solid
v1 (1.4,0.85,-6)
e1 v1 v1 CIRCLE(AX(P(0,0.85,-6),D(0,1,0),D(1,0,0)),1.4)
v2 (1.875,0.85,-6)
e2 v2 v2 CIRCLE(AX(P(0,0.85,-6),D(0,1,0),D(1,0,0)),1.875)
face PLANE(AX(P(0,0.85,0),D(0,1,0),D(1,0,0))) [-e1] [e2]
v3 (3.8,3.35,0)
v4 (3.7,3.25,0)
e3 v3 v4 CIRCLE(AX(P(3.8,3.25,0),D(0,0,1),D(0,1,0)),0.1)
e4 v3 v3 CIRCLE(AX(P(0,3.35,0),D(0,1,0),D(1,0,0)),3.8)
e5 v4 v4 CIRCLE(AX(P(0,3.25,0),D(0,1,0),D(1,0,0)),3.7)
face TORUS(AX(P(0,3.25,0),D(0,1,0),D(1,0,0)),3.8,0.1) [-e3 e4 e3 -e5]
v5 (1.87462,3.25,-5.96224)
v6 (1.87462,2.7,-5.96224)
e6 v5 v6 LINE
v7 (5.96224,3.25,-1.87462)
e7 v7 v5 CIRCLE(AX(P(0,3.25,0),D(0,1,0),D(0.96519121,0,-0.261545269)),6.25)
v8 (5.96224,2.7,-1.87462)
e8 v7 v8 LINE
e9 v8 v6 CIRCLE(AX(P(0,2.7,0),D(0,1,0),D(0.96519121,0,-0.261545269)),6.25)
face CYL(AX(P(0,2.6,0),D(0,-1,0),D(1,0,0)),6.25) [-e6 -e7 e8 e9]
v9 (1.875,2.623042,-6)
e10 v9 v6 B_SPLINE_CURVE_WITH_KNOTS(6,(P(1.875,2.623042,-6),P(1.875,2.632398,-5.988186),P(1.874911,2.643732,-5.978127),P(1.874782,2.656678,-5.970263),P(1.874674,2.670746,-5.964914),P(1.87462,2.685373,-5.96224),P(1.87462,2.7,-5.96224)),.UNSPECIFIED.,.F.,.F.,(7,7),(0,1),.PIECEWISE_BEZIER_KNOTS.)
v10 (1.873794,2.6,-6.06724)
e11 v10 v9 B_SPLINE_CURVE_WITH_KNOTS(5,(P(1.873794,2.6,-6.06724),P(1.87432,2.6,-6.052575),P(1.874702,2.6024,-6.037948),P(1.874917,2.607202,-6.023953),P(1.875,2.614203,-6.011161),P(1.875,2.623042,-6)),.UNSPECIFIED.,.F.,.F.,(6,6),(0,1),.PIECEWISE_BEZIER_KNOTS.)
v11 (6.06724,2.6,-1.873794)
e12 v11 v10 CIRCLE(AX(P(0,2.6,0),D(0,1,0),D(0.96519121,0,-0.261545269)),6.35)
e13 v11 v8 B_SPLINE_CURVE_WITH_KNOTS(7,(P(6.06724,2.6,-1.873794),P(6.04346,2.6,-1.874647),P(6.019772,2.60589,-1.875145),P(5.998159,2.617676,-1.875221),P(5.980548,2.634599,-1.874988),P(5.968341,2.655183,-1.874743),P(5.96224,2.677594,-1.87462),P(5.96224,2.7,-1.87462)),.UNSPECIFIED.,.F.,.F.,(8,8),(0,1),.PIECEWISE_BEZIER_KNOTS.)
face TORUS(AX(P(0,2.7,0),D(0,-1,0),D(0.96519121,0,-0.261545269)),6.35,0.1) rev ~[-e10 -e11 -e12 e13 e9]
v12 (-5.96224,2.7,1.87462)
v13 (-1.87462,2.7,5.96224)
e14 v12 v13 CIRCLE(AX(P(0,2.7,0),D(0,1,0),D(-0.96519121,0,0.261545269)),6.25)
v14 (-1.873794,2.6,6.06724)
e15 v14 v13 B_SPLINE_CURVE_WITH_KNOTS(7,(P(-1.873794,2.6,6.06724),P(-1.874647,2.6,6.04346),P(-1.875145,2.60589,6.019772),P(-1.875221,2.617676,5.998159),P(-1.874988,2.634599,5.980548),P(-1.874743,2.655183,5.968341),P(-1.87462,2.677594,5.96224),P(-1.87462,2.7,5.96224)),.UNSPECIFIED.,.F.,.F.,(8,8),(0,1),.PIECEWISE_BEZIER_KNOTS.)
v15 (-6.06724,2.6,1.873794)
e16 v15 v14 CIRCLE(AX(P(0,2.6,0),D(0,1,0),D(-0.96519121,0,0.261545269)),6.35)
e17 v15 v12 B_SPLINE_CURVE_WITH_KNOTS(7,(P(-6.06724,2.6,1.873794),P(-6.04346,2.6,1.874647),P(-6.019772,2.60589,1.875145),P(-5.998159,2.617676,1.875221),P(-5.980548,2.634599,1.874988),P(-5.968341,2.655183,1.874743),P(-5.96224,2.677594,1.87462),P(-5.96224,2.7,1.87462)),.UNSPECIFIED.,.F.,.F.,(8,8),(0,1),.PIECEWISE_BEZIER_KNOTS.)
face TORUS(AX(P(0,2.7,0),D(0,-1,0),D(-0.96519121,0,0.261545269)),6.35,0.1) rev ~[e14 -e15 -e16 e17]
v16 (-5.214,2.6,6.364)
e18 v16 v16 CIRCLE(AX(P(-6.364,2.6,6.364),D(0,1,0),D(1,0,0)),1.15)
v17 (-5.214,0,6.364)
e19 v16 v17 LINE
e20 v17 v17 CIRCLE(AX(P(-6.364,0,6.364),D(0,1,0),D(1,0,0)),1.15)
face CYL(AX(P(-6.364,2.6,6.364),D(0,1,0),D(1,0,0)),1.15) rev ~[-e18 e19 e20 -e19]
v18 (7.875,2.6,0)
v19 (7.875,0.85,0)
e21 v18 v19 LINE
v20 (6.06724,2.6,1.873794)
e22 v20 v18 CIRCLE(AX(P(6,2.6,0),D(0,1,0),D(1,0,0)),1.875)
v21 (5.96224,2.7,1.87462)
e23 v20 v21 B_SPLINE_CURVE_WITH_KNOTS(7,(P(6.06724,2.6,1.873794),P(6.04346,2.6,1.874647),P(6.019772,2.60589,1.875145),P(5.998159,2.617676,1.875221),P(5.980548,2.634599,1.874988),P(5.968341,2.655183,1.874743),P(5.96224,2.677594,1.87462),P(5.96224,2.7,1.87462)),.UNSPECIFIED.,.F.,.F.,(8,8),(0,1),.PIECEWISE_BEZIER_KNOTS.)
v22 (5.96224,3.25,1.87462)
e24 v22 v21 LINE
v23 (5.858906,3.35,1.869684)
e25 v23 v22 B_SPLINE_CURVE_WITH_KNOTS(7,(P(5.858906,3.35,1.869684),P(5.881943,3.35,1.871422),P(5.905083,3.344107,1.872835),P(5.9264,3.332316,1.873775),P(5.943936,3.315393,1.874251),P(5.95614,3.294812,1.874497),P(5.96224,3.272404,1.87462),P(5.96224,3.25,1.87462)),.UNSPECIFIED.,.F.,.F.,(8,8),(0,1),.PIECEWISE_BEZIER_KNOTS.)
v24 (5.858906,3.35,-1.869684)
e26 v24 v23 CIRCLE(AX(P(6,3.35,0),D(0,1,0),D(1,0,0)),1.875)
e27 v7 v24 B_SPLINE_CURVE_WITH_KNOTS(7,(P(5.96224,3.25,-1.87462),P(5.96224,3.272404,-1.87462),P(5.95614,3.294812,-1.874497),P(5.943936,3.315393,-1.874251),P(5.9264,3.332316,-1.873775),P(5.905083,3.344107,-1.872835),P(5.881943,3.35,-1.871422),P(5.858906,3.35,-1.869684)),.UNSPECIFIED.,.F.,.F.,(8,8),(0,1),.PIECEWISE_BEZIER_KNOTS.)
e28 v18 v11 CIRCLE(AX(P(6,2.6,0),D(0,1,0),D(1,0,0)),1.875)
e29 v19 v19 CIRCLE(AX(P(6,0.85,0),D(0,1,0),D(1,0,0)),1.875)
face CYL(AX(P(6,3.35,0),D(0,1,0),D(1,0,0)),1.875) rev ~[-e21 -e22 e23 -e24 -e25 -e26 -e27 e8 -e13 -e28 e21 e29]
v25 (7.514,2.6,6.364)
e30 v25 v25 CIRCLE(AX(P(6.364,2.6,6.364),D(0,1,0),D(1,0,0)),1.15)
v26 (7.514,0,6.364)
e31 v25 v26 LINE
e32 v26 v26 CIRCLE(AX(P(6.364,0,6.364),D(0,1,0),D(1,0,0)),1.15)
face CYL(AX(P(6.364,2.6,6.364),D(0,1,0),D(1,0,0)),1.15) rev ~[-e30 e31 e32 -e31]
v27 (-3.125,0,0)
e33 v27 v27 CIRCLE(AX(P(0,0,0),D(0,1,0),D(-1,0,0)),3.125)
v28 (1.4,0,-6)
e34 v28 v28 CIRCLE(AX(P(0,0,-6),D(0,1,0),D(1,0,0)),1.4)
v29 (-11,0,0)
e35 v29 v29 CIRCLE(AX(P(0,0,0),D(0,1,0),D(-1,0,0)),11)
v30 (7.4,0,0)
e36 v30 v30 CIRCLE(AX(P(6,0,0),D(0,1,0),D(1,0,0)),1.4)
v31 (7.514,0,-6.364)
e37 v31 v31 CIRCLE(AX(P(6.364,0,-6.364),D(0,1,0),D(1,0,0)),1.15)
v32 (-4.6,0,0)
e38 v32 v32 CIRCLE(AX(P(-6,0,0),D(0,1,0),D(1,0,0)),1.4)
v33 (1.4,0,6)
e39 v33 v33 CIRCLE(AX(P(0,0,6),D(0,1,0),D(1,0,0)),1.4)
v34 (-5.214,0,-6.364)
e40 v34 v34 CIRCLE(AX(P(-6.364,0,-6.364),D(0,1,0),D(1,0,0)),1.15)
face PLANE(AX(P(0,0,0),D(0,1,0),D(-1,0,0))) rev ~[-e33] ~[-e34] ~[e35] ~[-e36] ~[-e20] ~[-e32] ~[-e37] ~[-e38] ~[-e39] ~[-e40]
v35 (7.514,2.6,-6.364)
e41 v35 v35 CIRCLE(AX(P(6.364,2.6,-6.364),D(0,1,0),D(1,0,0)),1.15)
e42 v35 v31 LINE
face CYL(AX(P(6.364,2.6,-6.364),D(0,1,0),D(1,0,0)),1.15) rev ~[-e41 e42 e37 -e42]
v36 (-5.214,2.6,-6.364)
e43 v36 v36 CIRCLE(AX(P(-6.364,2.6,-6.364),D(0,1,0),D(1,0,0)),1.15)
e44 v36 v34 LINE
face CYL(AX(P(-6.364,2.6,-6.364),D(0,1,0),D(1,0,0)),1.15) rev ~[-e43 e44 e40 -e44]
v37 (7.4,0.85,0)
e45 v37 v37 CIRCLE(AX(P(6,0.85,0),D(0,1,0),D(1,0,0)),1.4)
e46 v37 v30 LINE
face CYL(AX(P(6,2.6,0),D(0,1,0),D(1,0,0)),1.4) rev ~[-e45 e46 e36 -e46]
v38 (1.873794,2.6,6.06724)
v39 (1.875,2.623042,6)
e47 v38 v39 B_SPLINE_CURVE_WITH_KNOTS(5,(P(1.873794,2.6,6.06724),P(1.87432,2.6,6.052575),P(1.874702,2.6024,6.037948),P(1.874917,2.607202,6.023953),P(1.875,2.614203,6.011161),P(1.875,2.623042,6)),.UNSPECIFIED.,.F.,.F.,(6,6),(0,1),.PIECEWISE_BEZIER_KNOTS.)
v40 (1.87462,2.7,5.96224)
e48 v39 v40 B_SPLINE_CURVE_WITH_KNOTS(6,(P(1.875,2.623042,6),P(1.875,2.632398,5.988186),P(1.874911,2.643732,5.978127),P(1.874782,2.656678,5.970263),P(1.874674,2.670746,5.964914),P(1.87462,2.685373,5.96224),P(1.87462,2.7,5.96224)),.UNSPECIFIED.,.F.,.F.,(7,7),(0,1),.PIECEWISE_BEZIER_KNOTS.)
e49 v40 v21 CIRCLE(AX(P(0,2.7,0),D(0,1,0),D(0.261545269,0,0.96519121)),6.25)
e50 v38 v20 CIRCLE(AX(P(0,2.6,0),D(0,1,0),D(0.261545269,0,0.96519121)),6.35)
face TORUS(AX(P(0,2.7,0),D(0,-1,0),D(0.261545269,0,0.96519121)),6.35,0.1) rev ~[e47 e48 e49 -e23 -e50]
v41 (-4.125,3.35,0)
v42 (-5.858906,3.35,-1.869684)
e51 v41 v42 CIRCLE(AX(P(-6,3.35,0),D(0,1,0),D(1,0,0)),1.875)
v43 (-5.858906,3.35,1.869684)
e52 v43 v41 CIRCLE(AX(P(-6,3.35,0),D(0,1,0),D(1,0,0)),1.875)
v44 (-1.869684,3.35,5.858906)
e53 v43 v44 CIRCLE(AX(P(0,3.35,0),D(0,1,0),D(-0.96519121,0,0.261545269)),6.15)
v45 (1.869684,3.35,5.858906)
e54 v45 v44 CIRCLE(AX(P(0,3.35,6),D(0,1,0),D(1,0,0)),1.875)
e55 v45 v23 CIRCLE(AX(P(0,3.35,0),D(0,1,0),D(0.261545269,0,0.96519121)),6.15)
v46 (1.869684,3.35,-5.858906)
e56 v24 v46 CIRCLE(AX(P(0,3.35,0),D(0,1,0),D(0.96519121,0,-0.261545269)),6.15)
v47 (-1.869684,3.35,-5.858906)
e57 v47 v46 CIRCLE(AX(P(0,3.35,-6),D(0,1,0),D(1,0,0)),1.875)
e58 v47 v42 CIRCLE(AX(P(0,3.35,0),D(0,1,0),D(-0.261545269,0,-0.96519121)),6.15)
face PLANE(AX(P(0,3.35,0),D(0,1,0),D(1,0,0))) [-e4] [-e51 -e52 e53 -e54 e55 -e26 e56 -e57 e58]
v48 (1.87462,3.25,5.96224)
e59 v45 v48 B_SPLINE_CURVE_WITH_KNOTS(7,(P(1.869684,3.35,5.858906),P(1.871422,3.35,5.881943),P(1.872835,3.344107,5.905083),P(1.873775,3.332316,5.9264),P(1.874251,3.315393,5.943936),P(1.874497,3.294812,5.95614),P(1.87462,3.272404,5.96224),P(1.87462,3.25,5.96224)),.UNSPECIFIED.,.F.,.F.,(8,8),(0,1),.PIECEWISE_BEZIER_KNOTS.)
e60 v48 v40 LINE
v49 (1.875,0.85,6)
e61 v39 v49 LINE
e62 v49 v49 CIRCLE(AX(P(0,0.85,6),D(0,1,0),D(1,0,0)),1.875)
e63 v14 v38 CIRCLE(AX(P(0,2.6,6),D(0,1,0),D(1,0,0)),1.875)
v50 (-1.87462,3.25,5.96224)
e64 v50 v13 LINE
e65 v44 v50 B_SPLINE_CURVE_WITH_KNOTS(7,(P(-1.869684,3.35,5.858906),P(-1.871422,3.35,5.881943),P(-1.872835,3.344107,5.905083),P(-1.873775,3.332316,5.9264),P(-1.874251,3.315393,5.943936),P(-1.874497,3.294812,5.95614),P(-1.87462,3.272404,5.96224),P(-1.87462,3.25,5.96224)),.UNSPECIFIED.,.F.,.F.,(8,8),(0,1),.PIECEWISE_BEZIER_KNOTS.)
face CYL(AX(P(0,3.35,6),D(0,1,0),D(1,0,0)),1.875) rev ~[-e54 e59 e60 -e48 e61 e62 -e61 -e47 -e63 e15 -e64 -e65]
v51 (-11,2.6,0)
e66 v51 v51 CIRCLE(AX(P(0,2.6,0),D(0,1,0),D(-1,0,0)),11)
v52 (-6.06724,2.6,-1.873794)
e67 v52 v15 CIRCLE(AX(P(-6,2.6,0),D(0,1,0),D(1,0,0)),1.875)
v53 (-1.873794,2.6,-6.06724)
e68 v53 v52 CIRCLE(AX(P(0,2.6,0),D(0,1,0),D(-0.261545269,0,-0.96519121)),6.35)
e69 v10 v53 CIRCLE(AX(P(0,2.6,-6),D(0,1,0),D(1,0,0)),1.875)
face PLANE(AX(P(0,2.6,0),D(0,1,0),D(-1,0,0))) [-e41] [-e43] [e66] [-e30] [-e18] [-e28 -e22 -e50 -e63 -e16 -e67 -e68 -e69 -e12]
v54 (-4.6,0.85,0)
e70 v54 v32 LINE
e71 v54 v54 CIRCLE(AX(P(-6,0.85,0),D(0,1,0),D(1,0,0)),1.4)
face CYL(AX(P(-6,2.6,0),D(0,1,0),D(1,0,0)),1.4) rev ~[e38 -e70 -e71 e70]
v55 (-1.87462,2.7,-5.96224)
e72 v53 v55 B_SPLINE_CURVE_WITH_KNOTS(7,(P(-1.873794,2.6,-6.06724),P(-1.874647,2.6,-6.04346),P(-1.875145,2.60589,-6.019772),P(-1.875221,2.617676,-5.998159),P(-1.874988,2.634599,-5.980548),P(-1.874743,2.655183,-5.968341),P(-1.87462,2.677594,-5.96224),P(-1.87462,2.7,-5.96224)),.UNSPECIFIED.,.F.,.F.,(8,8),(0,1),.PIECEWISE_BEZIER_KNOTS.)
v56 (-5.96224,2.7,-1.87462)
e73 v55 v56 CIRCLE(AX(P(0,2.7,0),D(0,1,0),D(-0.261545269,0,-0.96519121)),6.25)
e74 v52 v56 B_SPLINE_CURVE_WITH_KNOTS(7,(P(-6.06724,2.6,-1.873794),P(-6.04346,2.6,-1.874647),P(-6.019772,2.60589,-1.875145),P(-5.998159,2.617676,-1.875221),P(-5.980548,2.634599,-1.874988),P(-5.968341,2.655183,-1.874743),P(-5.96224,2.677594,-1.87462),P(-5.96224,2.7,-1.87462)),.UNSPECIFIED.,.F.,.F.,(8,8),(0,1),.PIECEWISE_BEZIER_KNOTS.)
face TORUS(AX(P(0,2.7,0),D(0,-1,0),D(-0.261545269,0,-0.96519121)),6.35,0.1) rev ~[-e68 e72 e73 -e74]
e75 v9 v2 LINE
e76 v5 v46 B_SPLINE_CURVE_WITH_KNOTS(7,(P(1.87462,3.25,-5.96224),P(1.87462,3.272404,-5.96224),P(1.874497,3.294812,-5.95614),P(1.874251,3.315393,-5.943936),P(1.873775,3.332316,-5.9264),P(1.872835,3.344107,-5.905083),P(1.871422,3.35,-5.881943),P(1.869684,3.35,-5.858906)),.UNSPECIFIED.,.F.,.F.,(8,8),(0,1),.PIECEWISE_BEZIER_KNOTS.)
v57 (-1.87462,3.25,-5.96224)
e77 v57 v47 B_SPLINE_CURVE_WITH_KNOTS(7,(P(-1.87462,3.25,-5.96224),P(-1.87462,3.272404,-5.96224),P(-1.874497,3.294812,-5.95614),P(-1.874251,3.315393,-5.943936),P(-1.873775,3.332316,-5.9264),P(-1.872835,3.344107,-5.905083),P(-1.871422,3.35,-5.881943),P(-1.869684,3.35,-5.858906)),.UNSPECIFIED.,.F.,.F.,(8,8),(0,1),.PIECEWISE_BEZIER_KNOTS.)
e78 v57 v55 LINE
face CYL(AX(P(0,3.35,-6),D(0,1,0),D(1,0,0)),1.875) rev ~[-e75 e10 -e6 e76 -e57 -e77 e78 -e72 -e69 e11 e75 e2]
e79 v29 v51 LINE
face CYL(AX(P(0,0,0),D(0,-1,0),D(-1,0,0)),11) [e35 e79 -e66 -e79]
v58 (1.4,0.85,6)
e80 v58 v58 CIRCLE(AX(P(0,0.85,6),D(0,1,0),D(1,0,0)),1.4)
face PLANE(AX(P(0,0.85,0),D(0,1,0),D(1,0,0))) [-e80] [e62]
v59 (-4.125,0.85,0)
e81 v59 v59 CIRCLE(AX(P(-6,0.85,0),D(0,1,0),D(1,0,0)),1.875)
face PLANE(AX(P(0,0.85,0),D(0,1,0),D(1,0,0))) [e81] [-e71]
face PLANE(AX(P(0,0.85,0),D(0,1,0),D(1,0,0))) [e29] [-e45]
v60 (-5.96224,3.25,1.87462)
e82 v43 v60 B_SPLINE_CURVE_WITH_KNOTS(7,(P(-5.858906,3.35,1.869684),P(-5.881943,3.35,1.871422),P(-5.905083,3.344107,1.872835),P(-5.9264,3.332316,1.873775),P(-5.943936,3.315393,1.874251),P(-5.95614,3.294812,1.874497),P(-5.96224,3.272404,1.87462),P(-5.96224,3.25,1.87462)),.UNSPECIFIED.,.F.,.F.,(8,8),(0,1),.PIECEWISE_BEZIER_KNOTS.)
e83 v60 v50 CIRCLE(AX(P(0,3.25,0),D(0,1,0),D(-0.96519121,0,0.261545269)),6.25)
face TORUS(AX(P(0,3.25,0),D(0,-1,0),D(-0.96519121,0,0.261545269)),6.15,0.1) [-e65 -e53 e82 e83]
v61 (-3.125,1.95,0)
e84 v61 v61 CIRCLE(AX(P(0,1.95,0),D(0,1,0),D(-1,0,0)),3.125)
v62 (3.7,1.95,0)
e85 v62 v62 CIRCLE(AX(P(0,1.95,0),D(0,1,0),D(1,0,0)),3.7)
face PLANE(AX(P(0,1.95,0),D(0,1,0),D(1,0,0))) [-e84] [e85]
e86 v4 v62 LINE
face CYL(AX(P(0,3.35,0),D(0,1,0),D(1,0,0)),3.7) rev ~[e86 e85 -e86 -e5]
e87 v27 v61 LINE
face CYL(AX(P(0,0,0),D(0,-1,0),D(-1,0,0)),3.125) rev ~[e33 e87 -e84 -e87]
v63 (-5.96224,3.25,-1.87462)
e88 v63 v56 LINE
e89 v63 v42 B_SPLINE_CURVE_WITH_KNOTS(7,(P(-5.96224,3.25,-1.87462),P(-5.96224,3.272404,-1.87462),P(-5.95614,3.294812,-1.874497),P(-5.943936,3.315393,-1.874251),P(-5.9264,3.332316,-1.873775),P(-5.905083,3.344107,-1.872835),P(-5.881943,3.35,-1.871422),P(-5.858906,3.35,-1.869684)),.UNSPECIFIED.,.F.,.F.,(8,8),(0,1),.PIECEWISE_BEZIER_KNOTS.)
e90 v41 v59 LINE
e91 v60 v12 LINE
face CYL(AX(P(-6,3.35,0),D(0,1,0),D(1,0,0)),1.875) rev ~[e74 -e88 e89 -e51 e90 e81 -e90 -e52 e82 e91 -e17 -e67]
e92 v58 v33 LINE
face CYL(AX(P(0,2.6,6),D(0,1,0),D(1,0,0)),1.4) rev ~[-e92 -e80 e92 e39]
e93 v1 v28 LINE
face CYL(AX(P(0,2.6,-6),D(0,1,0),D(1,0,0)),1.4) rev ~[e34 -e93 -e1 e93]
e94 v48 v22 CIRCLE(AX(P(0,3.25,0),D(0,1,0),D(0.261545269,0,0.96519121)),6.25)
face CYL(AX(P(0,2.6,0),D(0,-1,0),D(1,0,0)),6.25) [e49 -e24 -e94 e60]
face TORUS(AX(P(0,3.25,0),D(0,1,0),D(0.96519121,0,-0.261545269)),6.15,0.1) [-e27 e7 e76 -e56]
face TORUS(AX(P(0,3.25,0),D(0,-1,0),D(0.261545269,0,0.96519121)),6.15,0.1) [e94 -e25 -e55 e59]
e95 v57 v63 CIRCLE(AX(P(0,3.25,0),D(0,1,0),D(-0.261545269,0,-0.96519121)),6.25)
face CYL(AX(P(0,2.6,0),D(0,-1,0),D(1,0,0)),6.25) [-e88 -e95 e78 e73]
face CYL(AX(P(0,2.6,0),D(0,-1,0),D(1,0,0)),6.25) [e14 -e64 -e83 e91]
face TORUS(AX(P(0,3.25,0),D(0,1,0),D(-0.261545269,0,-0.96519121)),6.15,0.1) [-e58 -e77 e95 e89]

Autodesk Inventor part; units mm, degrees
ref_plane "YZ Plane" through (0, 0, 0) normal (1, 0, 0) x (0, 1, 0)
ref_plane "XZ Plane" through (0, 0, 0) normal (0, 1, 0) x (-1, 0, 0)
ref_plane "XY Plane" through (0, 0, 0) normal (0, 0, 1) x (1, 0, 0)
sketch "Sketch1" plane through (0, 0, 0) normal (0, 1, 0) x (-1, 0, 0)
  circle A0 centre (0, 0) radius 11
  circle A1 centre (0, 0) radius 3.125
  dimension "d0" = 22
  dimension "d1" = 6.25
extrude "Extrusion1" add sketch "Sketch1" along normal blind 2.6
sketch "Sketch2" plane through (0, 2.6, 0) normal (0, 1, 0) x (1, 0, 0)
  circle A0 centre (0, 0) radius 6.25
  circle A1 centre (0, 0) radius 3.125
  dimension "d4" = 12.5
extrude "Extrusion2" add sketch "Sketch2" along normal blind 0.75
sketch "Sketch3" plane through (0, 3.35, 0) normal (0, 1, 0) x (1, 0, 0)
  circle A0 centre (0, 0) radius 3.7
  dimension "d7" = 7.4
extrude "Extrusion3" cut sketch "Sketch3" against normal blind 1.4
sketch "Sketch4" plane through (0, 2.6, 0) normal (0, 1, 0) x (1, 0, 0)
  circle A0 centre (0, 0) radius 11 construction
  line L0 (0, 0) -> (-11, 0)
  circle A1 centre (0, 0) radius 11 projected
  circle A2 centre (-6, 0) radius 1.4
  circle A3 centre (0, -6) radius 1.4
  circle A4 centre (6, 0) radius 1.4
  circle A5 centre (0, 6) radius 1.4
  dimension "d10" = 22
  dimension "d11" = 2.8
  dimension "d12" = 6
  dimension "d15" = 360
extrude "Extrusion4" cut sketch "Sketch4" along normal through all both and the other way through all contours A2 L0 | L0 A2 | A3 | A4 | A5
sketch "Sketch5" plane through (0, 3.35, 0) normal (0, 1, 0) x (1, 0, 0)
  circle A0 centre (-6, 0) radius 1.4 projected
  circle A1 centre (-6, 0) radius 1.875
  circle A2 centre (0, -6) radius 1.875
  circle A3 centre (6, 0) radius 1.875
  circle A4 centre (0, 6) radius 1.875
  point P0 (0, 0)
  dimension "d19" = 3.75
  dimension "d22" = 360
extrude "Extrusion5" cut sketch "Sketch5" against normal blind 2.5 contours A0 | A1 | A2 | A3 | A4
sketch "Sketch6" plane through (0, 2.6, 0) normal (0, 1, 0) x (1, 0, 0)
  line L0 (0, 0) -> (-7.7782, -7.7782) construction
  circle A0 centre (0, 0) radius 11 projected
  line L1 (0, 0) -> (11, 0) construction
  circle A1 centre (0, 0) radius 9 construction
  circle A2 centre (-6.364, -6.364) radius 1.15
  circle A3 centre (6.364, -6.364) radius 1.15
  circle A4 centre (6.364, 6.364) radius 1.15
  circle A5 centre (-6.364, 6.364) radius 1.15
  dimension "d27" = 18
  dimension "d26" = 135
  dimension "d28" = 2.3
  dimension "d31" = 360
extrude "Extrusion6" cut sketch "Sketch6" against normal through all contours A2 | A3 | A4 | A5
fillet "Fillet1" radius 0.1 9 edges at (-3.7, 3.35, 0) (-4.4194, 3.35, 4.4194) (-4.4194, 3.35, -4.4194) (4.4194, 3.35, -4.4194) (4.4194, 3.35, 4.4194) (4.4194, 2.6, 4.4194) (4.4194, 2.6, -4.4194) (-4.4194, 2.6, 4.4194) (-4.4194, 2.6, -4.4194)
properties part number "Motor Plate" material "Aluminum 6061"
